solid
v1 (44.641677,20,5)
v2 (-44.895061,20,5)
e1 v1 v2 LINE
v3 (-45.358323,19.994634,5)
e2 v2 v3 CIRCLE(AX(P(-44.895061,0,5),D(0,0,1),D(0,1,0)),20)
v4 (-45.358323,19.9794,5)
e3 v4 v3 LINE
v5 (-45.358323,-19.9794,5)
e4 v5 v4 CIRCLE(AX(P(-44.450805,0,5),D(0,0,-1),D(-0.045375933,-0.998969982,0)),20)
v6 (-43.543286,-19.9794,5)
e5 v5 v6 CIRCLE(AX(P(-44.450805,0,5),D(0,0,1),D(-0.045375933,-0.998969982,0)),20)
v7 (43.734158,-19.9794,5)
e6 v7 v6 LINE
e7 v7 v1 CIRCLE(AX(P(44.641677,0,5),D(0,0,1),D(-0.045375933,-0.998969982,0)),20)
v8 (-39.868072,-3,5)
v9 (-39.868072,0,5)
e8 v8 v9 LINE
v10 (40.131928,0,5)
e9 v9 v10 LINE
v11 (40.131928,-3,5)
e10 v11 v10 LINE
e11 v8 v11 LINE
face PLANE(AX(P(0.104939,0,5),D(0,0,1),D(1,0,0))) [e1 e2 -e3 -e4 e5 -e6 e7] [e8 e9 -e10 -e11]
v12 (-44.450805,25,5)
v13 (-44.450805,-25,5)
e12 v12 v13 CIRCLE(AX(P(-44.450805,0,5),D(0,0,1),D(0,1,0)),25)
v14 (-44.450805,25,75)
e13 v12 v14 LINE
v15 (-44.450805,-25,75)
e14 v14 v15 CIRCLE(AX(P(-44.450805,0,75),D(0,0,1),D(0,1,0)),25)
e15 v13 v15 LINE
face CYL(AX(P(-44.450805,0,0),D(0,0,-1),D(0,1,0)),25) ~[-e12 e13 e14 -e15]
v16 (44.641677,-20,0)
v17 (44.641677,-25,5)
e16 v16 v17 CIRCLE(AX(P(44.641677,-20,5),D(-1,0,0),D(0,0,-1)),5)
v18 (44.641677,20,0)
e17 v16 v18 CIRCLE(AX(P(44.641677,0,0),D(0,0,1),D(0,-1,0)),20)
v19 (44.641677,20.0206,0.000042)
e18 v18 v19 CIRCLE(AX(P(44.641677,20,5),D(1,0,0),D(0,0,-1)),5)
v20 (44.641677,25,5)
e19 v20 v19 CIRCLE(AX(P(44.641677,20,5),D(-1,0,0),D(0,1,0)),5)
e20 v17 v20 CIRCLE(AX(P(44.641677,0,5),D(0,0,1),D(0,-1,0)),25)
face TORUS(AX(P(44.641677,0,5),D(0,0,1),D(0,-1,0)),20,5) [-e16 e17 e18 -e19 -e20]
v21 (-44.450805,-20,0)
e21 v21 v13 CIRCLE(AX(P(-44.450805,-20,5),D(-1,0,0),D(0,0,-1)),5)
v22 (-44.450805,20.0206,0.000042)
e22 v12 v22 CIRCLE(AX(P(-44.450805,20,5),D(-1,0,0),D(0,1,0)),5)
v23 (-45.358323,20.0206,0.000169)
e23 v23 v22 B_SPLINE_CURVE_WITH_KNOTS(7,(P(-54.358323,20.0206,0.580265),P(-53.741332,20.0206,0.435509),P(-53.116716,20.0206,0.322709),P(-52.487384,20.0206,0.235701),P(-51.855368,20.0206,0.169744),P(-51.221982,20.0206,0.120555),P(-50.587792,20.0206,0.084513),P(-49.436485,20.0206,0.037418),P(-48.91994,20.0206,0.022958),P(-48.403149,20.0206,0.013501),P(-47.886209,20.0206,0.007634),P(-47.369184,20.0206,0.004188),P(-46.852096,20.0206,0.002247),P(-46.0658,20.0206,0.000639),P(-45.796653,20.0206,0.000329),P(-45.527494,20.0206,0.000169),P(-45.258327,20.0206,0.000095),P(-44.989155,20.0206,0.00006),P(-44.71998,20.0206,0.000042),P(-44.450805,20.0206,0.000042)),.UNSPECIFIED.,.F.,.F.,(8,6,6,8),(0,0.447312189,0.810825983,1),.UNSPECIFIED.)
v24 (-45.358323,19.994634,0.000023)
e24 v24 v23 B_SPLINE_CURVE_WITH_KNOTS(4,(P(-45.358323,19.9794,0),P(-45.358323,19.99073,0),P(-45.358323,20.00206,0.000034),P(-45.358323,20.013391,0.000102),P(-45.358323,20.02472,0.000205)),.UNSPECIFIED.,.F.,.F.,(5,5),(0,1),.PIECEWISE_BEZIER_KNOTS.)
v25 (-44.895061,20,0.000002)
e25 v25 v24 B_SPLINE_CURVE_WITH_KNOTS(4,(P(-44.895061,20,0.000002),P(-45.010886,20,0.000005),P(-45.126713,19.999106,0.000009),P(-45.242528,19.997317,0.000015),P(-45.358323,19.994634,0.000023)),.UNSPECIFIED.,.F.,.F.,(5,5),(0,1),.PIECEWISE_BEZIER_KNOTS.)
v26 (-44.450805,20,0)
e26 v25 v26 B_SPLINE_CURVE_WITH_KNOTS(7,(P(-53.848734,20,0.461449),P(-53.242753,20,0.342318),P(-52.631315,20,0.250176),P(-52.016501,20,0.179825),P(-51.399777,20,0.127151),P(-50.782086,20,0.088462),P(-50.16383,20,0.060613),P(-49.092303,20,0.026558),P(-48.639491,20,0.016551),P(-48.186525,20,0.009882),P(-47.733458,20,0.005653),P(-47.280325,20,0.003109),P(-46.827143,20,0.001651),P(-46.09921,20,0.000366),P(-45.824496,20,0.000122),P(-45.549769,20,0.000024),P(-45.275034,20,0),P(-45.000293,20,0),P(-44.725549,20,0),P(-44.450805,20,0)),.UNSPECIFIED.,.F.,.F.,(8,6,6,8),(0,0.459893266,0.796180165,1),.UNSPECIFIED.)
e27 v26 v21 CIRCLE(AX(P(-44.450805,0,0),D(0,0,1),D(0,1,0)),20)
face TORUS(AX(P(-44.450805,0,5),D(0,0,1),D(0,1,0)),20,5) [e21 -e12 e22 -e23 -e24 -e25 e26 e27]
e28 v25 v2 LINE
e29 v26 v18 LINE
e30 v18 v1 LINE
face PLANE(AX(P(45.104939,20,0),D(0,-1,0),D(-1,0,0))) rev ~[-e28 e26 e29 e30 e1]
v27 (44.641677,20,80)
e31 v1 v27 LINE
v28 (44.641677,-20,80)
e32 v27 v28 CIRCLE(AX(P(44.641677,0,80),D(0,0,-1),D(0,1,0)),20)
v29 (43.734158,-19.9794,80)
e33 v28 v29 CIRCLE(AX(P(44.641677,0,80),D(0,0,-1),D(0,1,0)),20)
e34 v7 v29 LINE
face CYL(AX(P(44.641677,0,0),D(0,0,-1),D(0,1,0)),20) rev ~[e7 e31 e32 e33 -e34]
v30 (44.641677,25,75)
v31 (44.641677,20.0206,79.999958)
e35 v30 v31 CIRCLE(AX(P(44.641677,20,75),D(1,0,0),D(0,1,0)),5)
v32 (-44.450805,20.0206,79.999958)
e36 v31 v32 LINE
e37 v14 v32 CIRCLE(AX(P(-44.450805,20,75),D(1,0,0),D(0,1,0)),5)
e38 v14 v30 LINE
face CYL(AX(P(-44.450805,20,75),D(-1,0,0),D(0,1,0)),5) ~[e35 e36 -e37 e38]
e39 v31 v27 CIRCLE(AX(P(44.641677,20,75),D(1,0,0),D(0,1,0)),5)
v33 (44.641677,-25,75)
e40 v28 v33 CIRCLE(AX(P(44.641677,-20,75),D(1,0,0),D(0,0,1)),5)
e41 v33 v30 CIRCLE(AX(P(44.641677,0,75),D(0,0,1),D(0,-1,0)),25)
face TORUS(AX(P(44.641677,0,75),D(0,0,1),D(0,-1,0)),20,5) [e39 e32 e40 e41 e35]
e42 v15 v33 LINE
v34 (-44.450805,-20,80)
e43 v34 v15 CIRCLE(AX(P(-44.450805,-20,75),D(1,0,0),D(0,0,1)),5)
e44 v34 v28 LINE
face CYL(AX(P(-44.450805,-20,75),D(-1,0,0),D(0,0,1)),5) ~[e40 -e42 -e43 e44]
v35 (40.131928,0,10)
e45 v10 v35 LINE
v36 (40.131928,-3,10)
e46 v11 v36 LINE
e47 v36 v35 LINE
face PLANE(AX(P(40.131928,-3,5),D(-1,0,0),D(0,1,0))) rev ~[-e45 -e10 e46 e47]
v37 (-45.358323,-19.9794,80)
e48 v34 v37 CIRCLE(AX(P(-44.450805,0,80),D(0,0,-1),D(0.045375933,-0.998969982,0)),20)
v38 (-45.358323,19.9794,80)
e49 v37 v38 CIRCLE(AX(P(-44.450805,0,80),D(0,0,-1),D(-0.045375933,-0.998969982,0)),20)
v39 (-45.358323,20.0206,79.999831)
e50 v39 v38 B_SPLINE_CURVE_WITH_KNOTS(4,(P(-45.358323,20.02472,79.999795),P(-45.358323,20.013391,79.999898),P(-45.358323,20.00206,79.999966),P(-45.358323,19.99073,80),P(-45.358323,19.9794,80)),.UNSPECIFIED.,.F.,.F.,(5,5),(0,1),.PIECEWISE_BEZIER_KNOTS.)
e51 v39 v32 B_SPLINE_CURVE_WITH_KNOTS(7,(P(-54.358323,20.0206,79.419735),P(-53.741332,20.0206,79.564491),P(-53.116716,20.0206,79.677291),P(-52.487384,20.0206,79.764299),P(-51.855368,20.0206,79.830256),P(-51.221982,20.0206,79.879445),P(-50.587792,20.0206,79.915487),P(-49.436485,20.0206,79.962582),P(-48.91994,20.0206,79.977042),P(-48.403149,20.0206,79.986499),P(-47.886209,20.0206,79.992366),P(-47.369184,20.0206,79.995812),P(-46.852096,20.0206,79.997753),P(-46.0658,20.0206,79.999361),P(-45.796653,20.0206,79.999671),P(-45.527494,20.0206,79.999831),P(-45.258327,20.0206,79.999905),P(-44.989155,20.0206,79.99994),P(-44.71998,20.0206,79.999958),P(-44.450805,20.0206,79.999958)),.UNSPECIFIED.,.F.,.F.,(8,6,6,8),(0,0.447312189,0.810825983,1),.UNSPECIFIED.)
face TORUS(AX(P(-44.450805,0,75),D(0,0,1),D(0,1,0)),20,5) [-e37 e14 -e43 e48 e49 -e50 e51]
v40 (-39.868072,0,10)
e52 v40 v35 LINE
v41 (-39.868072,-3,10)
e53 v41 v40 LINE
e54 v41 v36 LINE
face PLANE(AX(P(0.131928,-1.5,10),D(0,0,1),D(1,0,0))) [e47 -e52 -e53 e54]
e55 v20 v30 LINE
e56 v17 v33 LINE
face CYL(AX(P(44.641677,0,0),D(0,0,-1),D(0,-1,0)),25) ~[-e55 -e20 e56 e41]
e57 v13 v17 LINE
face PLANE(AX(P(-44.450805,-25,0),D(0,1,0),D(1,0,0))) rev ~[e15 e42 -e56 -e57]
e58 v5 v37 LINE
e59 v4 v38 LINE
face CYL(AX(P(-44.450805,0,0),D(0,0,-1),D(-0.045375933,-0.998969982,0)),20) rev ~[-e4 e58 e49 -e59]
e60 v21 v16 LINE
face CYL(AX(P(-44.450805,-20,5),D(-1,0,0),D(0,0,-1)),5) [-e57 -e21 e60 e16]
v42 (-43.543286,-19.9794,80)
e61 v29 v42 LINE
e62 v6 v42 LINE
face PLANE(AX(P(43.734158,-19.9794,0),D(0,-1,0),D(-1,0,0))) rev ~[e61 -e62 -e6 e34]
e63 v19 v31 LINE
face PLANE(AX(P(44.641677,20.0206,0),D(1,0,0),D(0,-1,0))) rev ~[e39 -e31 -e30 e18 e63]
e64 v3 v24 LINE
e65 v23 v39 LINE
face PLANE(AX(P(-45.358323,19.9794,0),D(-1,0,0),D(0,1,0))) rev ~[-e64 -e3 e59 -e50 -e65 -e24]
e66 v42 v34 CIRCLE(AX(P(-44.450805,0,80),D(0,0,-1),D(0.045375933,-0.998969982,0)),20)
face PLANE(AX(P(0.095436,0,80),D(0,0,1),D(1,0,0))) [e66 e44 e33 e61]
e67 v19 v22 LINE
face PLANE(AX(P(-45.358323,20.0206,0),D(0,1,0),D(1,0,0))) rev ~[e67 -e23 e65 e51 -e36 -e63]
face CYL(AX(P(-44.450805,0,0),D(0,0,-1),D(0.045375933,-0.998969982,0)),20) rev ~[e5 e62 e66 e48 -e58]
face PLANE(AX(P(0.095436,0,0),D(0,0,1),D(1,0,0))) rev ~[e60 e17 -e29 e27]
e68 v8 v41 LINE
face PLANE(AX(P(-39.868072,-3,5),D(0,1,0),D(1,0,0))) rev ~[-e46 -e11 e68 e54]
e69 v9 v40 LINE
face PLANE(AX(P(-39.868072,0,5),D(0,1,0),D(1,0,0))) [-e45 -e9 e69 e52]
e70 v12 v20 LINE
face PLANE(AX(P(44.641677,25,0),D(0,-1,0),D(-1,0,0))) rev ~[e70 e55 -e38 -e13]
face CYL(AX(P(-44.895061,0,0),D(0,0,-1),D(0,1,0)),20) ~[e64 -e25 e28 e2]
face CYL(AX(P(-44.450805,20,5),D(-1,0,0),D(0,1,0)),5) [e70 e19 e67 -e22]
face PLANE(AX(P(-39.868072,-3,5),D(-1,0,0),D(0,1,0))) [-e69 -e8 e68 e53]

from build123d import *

# Parameters (mm, degrees)
F2_DEPTH    = 80
F3_DEPTH    = 5
F4_W        = 80
F4_H        = 3
F5_DEPTH    = 5
F6_T1_DEPTH = 89.0924813444
F6_T4_ANGLE = 180
F6_T6_ANGLE = 180
F7_T1_DEPTH = 89.0924813444
F7_T4_ANGLE = 180
F7_T6_ANGLE = 180


# Not quite as in the source:
# - a fillet or chamfer that OpenCascade refuses, or shapes differently, is made with other operations: its cross-section is extruded or revolved along the edge and cut away or added


with BuildPart() as f2:
    # F0 (on Top) → F2 (new body)
    with BuildSketch(Plane.XY):
        with BuildLine():
            Line((44.6416767532, 25), (-44.4508045912, 25))
            ThreePointArc((-44.4508045912, 25), (-69.4508045912, 0), (-44.4508045912, -25))
            Line((-44.4508045912, -25), (44.6416767532, -25))
            ThreePointArc((44.6416767532, -25), (69.6416767532, 0), (44.6416767532, 25))
        make_face()
        with BuildLine():
            Line((-45.3583232468, 19.9793996379), (-45.3583232468, 20.0206003621))
            Line((-45.3583232468, 20.0206003621), (44.6416767532, 20.0206003621))
            Line((44.6416767532, 20.0206003621), (44.6416767532, 20))
            ThreePointArc((44.6416767532, 20), (64.6365259994, -0.4538762181), (43.7341580975, -19.9793996379))
            Line((43.7341580975, -19.9793996379), (-43.5432859355, -19.9793996379))
            ThreePointArc((-43.5432859355, -19.9793996379), (-44.4508045912, -20), (-45.3583232468, -19.9793996379))
            ThreePointArc((-45.3583232468, -19.9793996379), (-64.4508045912, 0), (-45.3583232468, 19.9793996379))
        make_face(mode=Mode.SUBTRACT)
    extrude(amount=F2_DEPTH)

    # F1 (on Top) → F3 (join)
    with BuildSketch(Plane.XY):
        with BuildLine():
            Line((45.1049394906, 20), (-44.8950605094, 20))
            ThreePointArc((-44.8950605094, 20), (-64.8950605094, 0), (-44.8950605094, -20))
            Line((-44.8950605094, -20), (-39.8680716753, -20))
            Line((-39.8680716753, -20), (40.1319283247, -20))
            Line((40.1319283247, -20), (45.1049394906, -20))
            ThreePointArc((45.1049394906, -20), (65.1049394906, 0), (45.1049394906, 20))
        make_face()
    extrude(amount=F3_DEPTH)

    # F4 (on face) → F5 (join)
    with BuildSketch(Plane.XY.offset(5)):
        with Locations((0.1319283247, -1.5)):
            Rectangle(F4_W, F4_H)
    extrude(amount=F5_DEPTH)

    # F6: fillet of radius 5 on 1 edges, made by hand

    # F6_s2 → F6_t1 (cut)
    with BuildSketch(Plane.YZ.offset(-44.4508045912)):
        with BuildLine():
            ThreePointArc((-20, 80), (-23.5355339059, 78.5355339059), (-25, 75))
            Line((-25, 75), (-25, 80))
            Line((-25, 80), (-20, 80))
        make_face()
        with BuildLine():
            ThreePointArc((25, 75), (23.5355339059, 78.5355339059), (20, 80))
            Line((20, 80), (25, 80))
            Line((25, 80), (25, 75))
        make_face()
    extrude(amount=F6_T1_DEPTH, mode=Mode.SUBTRACT)

    # F6_s3 → F6_t4 (revolve, cut)
    with BuildSketch(Plane.YZ.offset(-44.4508045912)):
        with BuildLine():
            ThreePointArc((25, 75), (23.5355339059, 78.5355339059), (20, 80))
            Line((20, 80), (25, 80))
            Line((25, 80), (25, 75))
        make_face()
    revolve(axis=Axis((-44.4508045912, 0, 80), (0, 0, 1)), revolution_arc=F6_T4_ANGLE, mode=Mode.SUBTRACT)

    # F6_s5 → F6_t6 (revolve, cut)
    with BuildSketch(Plane.YZ.offset(44.6416767532)):
        with BuildLine():
            ThreePointArc((-25, 75), (-23.5355339059, 78.5355339059), (-20, 80))
            Line((-20, 80), (-25, 80))
            Line((-25, 80), (-25, 75))
        make_face()
    revolve(axis=Axis((44.6416767532, 0, 80), (0, 0, 1)), revolution_arc=F6_T6_ANGLE, mode=Mode.SUBTRACT)

    # F7: fillet of radius 5 on 5 edges, made by hand

    # F7_s2 → F7_t1 (cut)
    with BuildSketch(Plane.YZ.offset(-44.4508045912)):
        with BuildLine():
            ThreePointArc((-20, 0), (-23.5355339059, 1.4644660941), (-25, 5))
            Line((-25, 5), (-25, 0))
            Line((-25, 0), (-20, 0))
        make_face()
        with BuildLine():
            ThreePointArc((25, 5), (23.5355339059, 1.4644660941), (20, 0))
            Line((20, 0), (25, 0))
            Line((25, 0), (25, 5))
        make_face()
    extrude(amount=F7_T1_DEPTH, mode=Mode.SUBTRACT)

    # F7_s3 → F7_t4 (revolve, cut)
    with BuildSketch(Plane.YZ.offset(-44.4508045912)):
        with BuildLine():
            ThreePointArc((20, 0), (23.5355339059, 1.4644660941), (25, 5))
            Line((25, 5), (25, 0))
            Line((25, 0), (20, 0))
        make_face()
    revolve(axis=Axis((-44.4508045912, 0, 0), (0, 0, 1)), revolution_arc=F7_T4_ANGLE, mode=Mode.SUBTRACT)

    # F7_s5 → F7_t6 (revolve, cut)
    with BuildSketch(Plane.YZ.offset(44.6416767532)):
        with BuildLine():
            ThreePointArc((-20, 0), (-23.5355339059, 1.4644660941), (-25, 5))
            Line((-25, 5), (-25, 0))
            Line((-25, 0), (-20, 0))
        make_face()
    revolve(axis=Axis((44.6416767532, 0, 0), (0, 0, 1)), revolution_arc=F7_T6_ANGLE, mode=Mode.SUBTRACT)


solid = f2.part
